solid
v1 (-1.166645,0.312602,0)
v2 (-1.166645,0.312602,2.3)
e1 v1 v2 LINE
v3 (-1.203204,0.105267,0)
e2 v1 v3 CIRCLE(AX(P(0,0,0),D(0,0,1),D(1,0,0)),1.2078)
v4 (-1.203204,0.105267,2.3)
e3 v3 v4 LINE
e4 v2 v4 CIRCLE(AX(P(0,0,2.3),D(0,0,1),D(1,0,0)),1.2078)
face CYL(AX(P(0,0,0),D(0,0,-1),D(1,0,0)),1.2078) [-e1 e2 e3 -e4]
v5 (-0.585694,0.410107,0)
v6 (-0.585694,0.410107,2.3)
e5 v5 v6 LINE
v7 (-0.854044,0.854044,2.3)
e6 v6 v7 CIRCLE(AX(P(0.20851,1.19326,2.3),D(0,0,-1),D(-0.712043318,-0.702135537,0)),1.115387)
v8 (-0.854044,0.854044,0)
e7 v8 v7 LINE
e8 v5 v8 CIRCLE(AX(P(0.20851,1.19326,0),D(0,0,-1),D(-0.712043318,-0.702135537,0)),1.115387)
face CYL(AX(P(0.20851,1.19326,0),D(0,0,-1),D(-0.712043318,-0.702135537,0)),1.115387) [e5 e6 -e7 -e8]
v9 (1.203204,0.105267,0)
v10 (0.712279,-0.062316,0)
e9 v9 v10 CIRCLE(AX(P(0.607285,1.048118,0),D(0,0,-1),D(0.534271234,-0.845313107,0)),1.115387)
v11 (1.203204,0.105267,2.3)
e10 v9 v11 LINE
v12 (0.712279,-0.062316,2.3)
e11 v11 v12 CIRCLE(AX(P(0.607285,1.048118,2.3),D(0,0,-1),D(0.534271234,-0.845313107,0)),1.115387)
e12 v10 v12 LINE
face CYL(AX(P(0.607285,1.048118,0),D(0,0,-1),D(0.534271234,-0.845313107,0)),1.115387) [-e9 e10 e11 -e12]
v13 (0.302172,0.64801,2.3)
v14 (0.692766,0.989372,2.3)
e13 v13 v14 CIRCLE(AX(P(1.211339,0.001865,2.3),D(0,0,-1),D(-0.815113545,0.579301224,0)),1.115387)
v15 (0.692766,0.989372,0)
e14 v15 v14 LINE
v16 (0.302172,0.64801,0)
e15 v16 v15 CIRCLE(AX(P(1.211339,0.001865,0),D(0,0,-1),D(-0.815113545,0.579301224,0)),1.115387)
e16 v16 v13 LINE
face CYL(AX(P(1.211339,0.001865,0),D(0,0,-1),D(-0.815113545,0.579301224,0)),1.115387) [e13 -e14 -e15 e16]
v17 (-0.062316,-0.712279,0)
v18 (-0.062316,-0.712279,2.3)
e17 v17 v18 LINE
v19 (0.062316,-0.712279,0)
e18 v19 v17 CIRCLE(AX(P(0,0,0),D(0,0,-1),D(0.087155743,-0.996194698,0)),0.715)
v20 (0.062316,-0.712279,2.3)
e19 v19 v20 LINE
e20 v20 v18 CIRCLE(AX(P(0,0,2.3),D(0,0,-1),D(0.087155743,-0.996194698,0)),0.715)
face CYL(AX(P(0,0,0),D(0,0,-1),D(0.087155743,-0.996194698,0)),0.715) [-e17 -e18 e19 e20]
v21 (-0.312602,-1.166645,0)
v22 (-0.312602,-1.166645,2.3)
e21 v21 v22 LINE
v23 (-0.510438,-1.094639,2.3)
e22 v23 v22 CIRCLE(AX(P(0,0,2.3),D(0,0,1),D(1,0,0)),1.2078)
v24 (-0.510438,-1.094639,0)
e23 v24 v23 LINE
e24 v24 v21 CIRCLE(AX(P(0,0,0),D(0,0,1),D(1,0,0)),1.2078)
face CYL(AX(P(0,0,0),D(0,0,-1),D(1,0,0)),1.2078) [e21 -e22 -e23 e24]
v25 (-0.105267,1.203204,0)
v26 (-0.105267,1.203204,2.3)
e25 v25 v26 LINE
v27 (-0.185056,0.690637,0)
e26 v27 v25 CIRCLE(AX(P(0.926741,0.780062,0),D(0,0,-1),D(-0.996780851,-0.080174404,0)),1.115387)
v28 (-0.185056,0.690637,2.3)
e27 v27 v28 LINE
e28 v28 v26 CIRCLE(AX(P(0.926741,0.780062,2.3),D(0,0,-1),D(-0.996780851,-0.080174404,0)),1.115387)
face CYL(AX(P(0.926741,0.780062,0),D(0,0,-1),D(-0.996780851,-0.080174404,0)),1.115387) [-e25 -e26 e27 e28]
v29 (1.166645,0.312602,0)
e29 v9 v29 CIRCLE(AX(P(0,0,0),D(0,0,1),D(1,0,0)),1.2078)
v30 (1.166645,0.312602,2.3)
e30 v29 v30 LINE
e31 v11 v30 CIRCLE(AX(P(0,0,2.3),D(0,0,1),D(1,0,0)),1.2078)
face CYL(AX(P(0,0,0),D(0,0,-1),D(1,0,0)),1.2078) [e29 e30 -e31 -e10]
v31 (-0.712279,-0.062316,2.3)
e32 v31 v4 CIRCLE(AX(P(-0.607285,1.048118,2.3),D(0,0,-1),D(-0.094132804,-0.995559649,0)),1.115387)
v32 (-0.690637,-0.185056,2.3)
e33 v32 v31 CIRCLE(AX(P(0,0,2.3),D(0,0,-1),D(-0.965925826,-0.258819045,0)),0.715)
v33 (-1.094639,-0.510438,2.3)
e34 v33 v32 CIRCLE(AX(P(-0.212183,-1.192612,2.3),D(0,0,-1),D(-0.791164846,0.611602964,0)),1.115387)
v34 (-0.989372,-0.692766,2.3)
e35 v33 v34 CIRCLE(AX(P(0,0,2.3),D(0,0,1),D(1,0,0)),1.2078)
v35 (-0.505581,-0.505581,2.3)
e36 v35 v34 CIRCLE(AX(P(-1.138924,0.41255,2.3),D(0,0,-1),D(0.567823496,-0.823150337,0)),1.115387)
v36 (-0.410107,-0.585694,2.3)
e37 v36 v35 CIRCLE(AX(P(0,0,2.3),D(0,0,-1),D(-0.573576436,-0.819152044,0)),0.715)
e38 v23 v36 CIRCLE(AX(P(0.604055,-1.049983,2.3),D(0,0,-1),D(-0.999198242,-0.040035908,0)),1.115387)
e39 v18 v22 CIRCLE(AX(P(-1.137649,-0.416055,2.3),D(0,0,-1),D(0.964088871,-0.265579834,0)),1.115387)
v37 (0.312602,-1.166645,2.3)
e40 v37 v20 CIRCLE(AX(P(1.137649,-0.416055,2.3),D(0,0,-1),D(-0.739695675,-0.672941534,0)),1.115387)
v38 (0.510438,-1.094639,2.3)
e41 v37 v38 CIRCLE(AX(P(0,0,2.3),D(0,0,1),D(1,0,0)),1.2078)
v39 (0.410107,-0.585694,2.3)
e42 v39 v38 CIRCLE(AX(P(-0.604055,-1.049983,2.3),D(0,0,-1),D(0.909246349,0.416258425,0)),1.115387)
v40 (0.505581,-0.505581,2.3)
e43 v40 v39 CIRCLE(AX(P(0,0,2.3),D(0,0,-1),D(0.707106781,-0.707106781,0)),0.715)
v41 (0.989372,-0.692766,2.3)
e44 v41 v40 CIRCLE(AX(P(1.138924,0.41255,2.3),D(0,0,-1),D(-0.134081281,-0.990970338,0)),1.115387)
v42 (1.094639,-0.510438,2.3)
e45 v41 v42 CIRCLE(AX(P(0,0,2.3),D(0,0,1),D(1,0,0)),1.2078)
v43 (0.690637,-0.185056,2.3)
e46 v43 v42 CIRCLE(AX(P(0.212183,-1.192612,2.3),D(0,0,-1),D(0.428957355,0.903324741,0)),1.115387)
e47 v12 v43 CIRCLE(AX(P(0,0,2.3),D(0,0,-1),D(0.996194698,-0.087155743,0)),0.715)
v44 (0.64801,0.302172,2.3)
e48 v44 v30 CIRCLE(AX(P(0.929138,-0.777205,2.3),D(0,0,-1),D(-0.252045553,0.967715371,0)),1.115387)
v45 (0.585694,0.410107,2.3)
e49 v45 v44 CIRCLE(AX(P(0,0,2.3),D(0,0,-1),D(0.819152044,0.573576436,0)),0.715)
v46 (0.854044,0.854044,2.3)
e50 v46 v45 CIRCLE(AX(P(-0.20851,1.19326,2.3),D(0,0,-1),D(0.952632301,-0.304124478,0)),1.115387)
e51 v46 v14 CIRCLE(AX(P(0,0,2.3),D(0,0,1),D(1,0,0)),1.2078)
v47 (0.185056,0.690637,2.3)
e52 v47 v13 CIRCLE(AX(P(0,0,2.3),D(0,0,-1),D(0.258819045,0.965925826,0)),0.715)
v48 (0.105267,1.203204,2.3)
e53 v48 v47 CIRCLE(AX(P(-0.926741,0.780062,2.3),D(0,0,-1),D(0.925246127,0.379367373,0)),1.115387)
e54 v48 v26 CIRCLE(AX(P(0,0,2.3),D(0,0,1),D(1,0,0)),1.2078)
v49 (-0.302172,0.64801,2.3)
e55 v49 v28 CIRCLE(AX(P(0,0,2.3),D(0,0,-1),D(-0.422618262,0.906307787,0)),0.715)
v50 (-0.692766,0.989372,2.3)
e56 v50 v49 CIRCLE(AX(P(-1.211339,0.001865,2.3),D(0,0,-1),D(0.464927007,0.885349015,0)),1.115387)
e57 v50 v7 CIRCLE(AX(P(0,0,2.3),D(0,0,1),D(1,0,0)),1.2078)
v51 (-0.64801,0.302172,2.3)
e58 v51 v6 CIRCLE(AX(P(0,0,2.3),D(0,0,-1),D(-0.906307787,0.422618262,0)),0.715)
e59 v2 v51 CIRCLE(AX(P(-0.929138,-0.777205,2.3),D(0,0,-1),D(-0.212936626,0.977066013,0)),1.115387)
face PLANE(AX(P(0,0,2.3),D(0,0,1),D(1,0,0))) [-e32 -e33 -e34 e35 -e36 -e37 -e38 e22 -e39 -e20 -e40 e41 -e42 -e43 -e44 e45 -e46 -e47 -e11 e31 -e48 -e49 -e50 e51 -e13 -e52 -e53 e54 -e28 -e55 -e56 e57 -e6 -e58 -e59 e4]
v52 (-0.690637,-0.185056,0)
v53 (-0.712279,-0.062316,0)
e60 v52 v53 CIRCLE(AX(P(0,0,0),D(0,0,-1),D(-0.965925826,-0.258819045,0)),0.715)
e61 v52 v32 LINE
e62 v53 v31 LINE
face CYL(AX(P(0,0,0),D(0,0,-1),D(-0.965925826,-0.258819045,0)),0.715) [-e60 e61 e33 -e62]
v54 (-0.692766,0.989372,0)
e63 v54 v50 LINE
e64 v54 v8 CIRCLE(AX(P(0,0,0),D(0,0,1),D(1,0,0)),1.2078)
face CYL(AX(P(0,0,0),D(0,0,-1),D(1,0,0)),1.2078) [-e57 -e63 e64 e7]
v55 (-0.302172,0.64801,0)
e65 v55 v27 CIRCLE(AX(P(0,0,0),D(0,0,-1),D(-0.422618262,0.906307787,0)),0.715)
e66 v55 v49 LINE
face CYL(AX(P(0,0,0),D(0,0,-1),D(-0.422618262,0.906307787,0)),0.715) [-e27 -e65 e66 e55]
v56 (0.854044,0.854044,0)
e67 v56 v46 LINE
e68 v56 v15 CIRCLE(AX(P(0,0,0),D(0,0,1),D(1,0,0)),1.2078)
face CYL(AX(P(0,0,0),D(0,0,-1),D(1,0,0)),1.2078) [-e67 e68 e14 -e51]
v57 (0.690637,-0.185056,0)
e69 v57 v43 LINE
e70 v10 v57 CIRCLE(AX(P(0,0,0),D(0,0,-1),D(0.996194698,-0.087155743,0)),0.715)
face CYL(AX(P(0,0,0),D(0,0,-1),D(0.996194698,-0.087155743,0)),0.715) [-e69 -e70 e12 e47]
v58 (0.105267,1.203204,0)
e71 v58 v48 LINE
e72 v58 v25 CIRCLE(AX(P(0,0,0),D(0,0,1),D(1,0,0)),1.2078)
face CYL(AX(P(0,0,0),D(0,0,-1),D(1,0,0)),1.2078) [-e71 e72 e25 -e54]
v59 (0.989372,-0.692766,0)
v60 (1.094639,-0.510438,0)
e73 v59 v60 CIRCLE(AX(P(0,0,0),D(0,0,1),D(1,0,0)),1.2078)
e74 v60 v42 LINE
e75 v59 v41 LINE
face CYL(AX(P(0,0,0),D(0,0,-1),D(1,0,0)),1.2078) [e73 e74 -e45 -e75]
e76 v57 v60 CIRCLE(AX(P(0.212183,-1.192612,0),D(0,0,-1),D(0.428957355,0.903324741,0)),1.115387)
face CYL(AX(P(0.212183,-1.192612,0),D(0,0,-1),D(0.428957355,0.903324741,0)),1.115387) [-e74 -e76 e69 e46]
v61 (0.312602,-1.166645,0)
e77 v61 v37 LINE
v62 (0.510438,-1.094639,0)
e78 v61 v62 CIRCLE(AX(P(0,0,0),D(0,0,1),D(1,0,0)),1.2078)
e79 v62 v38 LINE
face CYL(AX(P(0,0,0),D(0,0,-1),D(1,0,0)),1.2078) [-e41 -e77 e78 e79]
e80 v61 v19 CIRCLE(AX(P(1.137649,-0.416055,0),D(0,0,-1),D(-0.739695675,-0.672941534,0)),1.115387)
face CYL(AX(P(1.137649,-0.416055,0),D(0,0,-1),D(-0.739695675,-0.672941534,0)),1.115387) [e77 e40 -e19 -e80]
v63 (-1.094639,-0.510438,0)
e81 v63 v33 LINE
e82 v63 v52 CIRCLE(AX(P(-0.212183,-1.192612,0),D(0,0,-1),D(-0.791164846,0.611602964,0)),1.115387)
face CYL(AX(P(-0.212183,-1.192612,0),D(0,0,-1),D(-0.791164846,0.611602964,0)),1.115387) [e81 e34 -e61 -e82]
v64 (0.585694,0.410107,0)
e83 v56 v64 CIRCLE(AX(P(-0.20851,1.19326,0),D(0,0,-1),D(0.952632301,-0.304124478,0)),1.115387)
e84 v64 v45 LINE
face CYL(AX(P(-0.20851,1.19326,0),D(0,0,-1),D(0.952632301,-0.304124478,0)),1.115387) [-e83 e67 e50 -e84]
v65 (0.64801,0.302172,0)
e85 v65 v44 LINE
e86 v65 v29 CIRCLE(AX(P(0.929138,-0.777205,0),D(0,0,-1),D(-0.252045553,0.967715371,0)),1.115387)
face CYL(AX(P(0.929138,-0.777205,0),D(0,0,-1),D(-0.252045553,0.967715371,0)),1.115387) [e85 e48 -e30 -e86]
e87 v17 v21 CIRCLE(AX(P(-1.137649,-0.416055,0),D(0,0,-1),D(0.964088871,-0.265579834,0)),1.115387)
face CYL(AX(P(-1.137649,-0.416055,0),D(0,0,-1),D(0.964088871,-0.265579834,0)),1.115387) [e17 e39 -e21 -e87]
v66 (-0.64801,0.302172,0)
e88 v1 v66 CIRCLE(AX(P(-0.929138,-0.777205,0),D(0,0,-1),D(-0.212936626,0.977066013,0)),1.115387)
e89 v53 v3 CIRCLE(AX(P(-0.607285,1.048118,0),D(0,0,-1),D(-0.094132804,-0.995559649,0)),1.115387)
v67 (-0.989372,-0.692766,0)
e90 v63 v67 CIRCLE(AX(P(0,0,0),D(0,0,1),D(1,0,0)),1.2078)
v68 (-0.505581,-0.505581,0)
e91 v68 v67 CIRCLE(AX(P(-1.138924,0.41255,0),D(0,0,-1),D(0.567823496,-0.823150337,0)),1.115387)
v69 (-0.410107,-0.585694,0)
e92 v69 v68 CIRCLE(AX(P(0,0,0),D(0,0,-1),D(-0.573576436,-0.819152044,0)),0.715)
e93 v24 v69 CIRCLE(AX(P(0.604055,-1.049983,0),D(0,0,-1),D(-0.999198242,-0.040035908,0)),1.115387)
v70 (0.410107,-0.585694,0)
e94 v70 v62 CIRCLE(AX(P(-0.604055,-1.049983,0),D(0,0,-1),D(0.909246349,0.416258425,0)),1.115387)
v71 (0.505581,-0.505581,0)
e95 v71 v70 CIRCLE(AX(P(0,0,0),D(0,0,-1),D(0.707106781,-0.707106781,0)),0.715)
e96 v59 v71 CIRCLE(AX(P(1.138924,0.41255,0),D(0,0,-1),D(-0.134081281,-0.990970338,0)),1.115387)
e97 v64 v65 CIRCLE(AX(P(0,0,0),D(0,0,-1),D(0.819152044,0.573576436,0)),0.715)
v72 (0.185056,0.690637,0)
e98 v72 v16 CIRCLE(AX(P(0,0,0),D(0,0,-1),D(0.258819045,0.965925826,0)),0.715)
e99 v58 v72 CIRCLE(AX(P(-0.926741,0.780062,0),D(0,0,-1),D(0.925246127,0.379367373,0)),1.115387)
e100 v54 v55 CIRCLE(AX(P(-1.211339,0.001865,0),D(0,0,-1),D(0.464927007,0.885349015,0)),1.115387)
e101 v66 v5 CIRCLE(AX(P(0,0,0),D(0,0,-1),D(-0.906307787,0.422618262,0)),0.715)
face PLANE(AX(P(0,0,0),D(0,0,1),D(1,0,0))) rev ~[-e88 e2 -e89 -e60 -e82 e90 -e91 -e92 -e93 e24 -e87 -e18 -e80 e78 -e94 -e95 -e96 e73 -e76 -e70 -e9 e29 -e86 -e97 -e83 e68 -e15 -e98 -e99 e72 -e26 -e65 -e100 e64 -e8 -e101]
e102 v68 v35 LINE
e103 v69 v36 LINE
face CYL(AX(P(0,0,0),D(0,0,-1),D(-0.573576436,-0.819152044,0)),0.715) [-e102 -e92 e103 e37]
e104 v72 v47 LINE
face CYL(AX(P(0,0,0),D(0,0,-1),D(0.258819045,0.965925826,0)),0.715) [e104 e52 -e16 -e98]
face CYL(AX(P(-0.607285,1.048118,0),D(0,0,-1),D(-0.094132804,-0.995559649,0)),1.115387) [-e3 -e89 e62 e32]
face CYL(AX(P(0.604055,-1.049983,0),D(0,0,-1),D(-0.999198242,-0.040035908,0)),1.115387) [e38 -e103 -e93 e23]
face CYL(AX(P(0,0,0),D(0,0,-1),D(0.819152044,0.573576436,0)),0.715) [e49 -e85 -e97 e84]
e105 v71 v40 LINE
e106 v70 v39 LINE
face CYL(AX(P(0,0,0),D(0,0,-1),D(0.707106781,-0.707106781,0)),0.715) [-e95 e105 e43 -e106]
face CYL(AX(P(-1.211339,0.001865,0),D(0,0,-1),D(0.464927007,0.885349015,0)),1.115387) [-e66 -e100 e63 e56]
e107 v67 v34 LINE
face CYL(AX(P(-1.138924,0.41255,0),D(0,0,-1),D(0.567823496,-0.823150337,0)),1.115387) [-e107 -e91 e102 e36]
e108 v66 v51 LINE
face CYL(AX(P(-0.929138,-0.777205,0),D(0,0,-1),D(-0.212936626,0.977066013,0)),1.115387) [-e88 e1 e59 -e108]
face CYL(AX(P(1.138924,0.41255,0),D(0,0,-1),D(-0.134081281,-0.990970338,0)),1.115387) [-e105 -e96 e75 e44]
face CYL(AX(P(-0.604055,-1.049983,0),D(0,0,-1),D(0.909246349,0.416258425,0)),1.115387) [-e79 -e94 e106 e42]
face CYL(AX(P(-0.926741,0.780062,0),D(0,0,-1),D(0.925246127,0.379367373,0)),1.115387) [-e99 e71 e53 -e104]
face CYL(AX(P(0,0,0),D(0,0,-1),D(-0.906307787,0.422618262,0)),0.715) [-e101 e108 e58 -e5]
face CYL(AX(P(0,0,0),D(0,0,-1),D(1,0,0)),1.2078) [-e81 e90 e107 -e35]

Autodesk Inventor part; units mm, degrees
sketch "Sketch1" plane through (0, 0, 0) normal (0, 0, 1) x (1, 0, 0)
  circle A0 centre (0, 0) radius 1.2078
  dimension "d0" = 2.4156
extrude "Extrusion1" add sketch "Sketch1" along normal blind 2.3
ref_plane "Work Plane2" through (0, 0, 1.15) normal (0, 0, 1) x (1, 0, 0)
sketch "Sketch2" plane through (0, 0, 0) normal (0, 0, -1) x (-1, 0, 0)
  circle A0 centre (0, 0) radius 1.2078 projected
  circle A1 centre (0, 0) radius 1
  dimension "d3" = 2
surface extrude "Pitch Diameter" sketch "Sketch2" against normal through all shown no curves A1
ref_plane "Work Plane8" through (0, 0, 0) normal (0.9396926, 0.3420201, 0) x (0, 0, 1)
ref_plane "Work Plane9" through (0, 0, 0) normal (1, 0, 0) x (0, 1, 0)
spur gear teeth "Spur Gear" teeth 9 pitch diameter 1.98 tip diameter 2.4156 root diameter 1.43 face width 2.3 start plane through (0, 0, 0) normal (0, 0, -1) x (-1, 0, 0)
equation "\"d0\" = da_da"
equation "\"d1\" = da_b"
equation "\"d3\" = da_dw"
equation "\"d16\" = da_aw"
equation "\"d43\" = da_aw"
equation "\"d46\" = da_aw"
equation "\"da_da\" = 2.415579"
equation "\"da_b\" = 2.3"
equation "\"da_dw\" = 2"
equation "\"da_aw\" = 6"
properties part number "Spur Gear1" material "Steel"
